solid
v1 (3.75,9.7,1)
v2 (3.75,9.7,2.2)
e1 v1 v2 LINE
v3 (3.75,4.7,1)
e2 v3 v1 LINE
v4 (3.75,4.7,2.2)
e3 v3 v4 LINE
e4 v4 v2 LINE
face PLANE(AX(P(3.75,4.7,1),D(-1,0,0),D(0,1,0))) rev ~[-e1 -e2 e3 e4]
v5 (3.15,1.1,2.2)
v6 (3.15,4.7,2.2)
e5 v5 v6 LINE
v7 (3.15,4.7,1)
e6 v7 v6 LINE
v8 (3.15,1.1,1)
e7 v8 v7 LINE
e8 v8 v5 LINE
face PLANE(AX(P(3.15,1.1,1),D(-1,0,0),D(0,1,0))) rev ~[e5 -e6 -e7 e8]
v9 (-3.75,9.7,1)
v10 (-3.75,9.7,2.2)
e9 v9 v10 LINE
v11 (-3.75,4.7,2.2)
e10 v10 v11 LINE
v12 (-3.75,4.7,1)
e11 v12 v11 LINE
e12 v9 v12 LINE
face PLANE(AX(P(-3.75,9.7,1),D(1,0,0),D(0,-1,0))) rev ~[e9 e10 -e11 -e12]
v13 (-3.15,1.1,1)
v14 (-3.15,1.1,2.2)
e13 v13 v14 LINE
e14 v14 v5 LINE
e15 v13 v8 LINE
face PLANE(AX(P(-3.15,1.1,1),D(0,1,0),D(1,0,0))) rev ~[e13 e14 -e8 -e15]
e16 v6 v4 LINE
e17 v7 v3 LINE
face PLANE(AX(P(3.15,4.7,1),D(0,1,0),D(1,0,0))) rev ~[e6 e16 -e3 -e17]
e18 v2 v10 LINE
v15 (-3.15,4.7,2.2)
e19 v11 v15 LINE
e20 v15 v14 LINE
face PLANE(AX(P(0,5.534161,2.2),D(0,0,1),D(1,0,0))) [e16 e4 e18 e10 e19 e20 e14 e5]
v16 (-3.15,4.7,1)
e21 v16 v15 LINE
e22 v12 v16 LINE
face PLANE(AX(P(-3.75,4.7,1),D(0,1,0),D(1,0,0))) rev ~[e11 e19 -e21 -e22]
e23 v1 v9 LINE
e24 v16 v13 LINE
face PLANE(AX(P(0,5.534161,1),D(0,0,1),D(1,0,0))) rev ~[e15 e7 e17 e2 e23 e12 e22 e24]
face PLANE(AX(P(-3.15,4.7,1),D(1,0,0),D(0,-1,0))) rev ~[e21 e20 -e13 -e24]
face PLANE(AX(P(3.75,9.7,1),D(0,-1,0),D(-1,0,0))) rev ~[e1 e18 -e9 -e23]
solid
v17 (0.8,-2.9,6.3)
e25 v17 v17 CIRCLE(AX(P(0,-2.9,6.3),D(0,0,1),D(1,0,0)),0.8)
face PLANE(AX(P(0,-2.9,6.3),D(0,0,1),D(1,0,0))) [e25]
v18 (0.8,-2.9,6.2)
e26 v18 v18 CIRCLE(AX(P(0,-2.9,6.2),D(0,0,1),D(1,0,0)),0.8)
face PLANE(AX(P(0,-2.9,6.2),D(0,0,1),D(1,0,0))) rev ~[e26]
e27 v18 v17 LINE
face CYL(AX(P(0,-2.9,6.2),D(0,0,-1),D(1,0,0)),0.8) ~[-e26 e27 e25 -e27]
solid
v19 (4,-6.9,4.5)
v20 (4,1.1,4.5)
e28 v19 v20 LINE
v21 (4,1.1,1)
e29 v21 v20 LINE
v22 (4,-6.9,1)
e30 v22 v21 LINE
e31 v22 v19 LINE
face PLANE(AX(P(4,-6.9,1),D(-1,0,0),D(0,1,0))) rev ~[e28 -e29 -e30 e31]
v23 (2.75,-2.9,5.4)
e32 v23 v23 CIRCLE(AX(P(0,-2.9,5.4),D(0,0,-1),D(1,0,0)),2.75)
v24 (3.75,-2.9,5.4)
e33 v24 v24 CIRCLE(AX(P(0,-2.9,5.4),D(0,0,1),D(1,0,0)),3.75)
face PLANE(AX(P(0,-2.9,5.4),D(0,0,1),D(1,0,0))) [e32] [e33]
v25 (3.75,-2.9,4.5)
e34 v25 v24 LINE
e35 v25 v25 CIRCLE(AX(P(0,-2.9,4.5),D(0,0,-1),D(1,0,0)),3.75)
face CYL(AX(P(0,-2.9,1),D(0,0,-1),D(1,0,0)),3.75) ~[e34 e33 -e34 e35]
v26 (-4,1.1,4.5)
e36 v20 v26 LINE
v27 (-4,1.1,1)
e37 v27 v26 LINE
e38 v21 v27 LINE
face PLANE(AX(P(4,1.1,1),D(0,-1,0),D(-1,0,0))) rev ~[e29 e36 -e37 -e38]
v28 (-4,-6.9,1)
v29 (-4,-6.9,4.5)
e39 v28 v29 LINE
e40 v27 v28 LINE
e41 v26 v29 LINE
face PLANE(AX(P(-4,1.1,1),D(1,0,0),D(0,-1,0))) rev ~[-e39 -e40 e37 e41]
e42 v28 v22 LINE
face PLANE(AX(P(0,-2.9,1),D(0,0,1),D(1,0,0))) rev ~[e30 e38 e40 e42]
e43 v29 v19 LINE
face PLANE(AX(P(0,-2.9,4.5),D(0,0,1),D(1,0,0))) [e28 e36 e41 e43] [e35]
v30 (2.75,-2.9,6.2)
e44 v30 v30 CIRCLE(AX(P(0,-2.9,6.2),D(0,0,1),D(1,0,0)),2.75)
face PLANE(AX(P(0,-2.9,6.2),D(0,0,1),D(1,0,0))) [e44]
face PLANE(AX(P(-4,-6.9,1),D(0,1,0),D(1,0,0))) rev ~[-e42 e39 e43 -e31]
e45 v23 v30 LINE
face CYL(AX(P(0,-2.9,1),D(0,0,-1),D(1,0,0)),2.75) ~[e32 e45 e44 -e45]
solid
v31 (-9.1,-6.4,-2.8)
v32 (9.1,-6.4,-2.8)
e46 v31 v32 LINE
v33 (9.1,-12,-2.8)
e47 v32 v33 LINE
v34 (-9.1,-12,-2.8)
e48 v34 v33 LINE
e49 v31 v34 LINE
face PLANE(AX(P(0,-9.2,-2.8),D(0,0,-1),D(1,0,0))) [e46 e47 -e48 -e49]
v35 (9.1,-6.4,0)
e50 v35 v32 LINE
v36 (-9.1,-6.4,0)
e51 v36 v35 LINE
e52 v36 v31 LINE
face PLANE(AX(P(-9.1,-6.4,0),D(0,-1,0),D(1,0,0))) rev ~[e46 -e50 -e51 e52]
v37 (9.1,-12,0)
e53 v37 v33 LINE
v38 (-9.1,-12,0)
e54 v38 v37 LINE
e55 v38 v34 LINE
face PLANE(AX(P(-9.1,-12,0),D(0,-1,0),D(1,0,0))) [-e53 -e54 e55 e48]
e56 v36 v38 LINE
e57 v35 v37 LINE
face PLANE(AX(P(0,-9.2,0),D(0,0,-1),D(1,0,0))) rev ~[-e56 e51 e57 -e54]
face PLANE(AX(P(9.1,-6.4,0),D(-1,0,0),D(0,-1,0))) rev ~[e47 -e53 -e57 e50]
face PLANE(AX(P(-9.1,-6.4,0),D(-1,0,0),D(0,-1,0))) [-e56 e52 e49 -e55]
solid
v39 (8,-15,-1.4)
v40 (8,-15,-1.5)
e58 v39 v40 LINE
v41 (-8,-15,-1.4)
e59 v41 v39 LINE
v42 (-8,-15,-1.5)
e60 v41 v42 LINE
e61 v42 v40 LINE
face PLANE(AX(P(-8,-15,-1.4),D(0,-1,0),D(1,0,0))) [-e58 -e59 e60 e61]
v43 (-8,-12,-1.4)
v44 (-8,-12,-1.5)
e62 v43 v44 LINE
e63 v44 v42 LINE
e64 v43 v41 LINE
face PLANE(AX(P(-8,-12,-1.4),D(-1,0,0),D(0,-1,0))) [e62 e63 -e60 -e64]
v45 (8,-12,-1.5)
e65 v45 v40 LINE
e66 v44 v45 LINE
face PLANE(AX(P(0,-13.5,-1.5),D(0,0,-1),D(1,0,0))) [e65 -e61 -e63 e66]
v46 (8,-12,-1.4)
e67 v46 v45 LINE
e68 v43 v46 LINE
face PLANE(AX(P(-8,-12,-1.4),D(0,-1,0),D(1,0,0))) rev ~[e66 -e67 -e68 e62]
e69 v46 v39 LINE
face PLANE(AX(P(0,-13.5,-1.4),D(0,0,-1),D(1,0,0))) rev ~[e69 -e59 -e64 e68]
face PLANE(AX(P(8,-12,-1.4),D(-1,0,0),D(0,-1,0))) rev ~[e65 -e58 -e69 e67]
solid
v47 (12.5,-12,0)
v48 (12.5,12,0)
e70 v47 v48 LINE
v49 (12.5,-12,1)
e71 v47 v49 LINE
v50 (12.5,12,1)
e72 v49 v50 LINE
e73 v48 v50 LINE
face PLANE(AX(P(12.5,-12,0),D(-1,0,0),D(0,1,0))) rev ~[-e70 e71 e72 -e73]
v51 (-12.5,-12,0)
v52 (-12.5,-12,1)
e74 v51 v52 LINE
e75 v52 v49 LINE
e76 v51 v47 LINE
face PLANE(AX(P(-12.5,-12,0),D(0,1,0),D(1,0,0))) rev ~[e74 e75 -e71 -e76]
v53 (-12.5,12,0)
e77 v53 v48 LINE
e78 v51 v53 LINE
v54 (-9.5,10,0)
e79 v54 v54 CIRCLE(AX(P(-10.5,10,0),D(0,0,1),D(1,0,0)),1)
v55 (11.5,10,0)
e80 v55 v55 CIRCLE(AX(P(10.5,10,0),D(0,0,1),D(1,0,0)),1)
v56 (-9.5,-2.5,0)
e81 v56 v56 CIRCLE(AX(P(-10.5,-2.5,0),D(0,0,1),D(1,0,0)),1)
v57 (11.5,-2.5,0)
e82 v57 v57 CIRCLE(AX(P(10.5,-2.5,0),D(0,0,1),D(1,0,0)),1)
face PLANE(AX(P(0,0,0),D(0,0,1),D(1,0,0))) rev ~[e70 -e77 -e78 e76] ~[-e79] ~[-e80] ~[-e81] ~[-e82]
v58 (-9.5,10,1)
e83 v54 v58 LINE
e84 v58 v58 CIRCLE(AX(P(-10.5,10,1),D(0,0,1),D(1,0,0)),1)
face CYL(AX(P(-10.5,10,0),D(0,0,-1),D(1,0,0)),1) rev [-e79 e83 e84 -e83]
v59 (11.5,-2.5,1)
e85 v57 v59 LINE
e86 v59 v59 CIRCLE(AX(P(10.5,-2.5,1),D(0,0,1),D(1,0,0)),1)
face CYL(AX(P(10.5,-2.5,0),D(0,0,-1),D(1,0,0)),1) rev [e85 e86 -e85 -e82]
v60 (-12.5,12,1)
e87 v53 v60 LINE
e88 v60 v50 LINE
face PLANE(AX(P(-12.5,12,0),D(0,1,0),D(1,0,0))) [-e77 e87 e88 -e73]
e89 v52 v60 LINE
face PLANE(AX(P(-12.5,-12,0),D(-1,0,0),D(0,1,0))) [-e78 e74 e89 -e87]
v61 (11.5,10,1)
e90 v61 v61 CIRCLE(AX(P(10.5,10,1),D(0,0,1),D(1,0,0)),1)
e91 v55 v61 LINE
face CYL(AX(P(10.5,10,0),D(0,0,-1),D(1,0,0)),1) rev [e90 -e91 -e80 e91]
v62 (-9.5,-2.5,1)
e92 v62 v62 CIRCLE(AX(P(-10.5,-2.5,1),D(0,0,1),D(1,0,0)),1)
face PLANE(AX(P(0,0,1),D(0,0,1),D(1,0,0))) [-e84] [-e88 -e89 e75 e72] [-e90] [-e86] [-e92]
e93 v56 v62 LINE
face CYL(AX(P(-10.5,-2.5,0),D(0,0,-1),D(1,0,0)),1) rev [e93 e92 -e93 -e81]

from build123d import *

# Parameters (mm, degrees)
F0_W      = 25
F0_H      = 24
F0_R      = 1
F1_DEPTH  = 1
F2_R      = 3.75
F2_R_2    = 2.75
F3_DEPTH  = 3.5
F4_DEPTH  = 4.4
F5_DEPTH  = 5.2
F6_R      = 0.8
F7_DEPTH  = 0.1
F8_W      = 18.2
F8_H      = 5.6
F9_DEPTH  = 2.8
F11_DEPTH = 1.2
F13_W     = 16
F13_H     = 3
F14_DEPTH = 0.1


with BuildPart() as f1:
    # F0 (on Top) → F1 (new body)
    with BuildSketch(Plane.XY):
        Rectangle(F0_W, F0_H)
        with Locations((-10.5, -2.5)):
            Circle(F0_R, mode=Mode.SUBTRACT)
        with Locations((10.5, -2.5)):
            Circle(F0_R, mode=Mode.SUBTRACT)
        with Locations((-10.5, 10)):
            Circle(F0_R, mode=Mode.SUBTRACT)
        with Locations((10.5, 10)):
            Circle(F0_R, mode=Mode.SUBTRACT)
    extrude(amount=F1_DEPTH)


with BuildPart() as f3:
    # F2 (on face) → F3 (new body)
    with BuildSketch(Plane.XY.offset(1)):
        Polygon((4, -6.9), (4, 1.1), (3.4, 1.1), (-3.4, 1.1), (-4, 1.1), (-4, -6.9), align=None)
        with Locations((0, -2.9)):
            Circle(F2_R, mode=Mode.SUBTRACT)
        with Locations((0, -2.9)):
            Circle(F2_R)
        with Locations((0, -2.9)):
            Circle(F2_R_2, mode=Mode.SUBTRACT)
        with Locations((0, -2.9)):
            Circle(F2_R_2)
    extrude(amount=F3_DEPTH)

    # F2 (on face) → F4 (join)
    with BuildSketch(Plane.XY.offset(1)):
        with Locations((0, -2.9)):
            Circle(F2_R)
        with Locations((0, -2.9)):
            Circle(F2_R_2, mode=Mode.SUBTRACT)
        with Locations((0, -2.9)):
            Circle(F2_R_2)
    extrude(amount=F4_DEPTH)

    # F2 (on face) → F5 (join)
    with BuildSketch(Plane.XY.offset(1)):
        with Locations((0, -2.9)):
            Circle(F2_R_2)
    extrude(amount=F5_DEPTH)


with BuildPart() as f7:
    # F6 (on face) → F7 (new body)
    with BuildSketch(Plane.XY.offset(6.2)):
        with Locations((0, -2.9)):
            Circle(F6_R)
    extrude(amount=F7_DEPTH)


with BuildPart() as f9:
    # F8 (on face) → F9 (new body)
    with BuildSketch(Plane(origin=(0, 0, 0), x_dir=(1, 0, 0), z_dir=(0, 0, -1))):
        with Locations((0, 9.2)):
            Rectangle(F8_W, F8_H)
    extrude(amount=F9_DEPTH)


with BuildPart() as f11:
    # F10 (on face) → F11 (new body)
    with BuildSketch(Plane.XY.offset(1)):
        Polygon((-3.15, 4.7), (-3.15, 1.1), (3.15, 1.1), (3.15, 4.7), (3.75, 4.7), (3.75, 9.7), (-3.75, 9.7), (-3.75, 4.7), align=None)
    extrude(amount=F11_DEPTH)


with BuildPart() as f14:
    # F13 (on offset) → F14 (new body)
    with BuildSketch(Plane(origin=(0, 0, -1.4), x_dir=(1, 0, 0), z_dir=(0, 0, -1))):
        with Locations((0, 13.5)):
            Rectangle(F13_W, F13_H)
    extrude(amount=F14_DEPTH)


solid = Compound([f1.part, f3.part, f7.part, f9.part, f11.part, f14.part])
